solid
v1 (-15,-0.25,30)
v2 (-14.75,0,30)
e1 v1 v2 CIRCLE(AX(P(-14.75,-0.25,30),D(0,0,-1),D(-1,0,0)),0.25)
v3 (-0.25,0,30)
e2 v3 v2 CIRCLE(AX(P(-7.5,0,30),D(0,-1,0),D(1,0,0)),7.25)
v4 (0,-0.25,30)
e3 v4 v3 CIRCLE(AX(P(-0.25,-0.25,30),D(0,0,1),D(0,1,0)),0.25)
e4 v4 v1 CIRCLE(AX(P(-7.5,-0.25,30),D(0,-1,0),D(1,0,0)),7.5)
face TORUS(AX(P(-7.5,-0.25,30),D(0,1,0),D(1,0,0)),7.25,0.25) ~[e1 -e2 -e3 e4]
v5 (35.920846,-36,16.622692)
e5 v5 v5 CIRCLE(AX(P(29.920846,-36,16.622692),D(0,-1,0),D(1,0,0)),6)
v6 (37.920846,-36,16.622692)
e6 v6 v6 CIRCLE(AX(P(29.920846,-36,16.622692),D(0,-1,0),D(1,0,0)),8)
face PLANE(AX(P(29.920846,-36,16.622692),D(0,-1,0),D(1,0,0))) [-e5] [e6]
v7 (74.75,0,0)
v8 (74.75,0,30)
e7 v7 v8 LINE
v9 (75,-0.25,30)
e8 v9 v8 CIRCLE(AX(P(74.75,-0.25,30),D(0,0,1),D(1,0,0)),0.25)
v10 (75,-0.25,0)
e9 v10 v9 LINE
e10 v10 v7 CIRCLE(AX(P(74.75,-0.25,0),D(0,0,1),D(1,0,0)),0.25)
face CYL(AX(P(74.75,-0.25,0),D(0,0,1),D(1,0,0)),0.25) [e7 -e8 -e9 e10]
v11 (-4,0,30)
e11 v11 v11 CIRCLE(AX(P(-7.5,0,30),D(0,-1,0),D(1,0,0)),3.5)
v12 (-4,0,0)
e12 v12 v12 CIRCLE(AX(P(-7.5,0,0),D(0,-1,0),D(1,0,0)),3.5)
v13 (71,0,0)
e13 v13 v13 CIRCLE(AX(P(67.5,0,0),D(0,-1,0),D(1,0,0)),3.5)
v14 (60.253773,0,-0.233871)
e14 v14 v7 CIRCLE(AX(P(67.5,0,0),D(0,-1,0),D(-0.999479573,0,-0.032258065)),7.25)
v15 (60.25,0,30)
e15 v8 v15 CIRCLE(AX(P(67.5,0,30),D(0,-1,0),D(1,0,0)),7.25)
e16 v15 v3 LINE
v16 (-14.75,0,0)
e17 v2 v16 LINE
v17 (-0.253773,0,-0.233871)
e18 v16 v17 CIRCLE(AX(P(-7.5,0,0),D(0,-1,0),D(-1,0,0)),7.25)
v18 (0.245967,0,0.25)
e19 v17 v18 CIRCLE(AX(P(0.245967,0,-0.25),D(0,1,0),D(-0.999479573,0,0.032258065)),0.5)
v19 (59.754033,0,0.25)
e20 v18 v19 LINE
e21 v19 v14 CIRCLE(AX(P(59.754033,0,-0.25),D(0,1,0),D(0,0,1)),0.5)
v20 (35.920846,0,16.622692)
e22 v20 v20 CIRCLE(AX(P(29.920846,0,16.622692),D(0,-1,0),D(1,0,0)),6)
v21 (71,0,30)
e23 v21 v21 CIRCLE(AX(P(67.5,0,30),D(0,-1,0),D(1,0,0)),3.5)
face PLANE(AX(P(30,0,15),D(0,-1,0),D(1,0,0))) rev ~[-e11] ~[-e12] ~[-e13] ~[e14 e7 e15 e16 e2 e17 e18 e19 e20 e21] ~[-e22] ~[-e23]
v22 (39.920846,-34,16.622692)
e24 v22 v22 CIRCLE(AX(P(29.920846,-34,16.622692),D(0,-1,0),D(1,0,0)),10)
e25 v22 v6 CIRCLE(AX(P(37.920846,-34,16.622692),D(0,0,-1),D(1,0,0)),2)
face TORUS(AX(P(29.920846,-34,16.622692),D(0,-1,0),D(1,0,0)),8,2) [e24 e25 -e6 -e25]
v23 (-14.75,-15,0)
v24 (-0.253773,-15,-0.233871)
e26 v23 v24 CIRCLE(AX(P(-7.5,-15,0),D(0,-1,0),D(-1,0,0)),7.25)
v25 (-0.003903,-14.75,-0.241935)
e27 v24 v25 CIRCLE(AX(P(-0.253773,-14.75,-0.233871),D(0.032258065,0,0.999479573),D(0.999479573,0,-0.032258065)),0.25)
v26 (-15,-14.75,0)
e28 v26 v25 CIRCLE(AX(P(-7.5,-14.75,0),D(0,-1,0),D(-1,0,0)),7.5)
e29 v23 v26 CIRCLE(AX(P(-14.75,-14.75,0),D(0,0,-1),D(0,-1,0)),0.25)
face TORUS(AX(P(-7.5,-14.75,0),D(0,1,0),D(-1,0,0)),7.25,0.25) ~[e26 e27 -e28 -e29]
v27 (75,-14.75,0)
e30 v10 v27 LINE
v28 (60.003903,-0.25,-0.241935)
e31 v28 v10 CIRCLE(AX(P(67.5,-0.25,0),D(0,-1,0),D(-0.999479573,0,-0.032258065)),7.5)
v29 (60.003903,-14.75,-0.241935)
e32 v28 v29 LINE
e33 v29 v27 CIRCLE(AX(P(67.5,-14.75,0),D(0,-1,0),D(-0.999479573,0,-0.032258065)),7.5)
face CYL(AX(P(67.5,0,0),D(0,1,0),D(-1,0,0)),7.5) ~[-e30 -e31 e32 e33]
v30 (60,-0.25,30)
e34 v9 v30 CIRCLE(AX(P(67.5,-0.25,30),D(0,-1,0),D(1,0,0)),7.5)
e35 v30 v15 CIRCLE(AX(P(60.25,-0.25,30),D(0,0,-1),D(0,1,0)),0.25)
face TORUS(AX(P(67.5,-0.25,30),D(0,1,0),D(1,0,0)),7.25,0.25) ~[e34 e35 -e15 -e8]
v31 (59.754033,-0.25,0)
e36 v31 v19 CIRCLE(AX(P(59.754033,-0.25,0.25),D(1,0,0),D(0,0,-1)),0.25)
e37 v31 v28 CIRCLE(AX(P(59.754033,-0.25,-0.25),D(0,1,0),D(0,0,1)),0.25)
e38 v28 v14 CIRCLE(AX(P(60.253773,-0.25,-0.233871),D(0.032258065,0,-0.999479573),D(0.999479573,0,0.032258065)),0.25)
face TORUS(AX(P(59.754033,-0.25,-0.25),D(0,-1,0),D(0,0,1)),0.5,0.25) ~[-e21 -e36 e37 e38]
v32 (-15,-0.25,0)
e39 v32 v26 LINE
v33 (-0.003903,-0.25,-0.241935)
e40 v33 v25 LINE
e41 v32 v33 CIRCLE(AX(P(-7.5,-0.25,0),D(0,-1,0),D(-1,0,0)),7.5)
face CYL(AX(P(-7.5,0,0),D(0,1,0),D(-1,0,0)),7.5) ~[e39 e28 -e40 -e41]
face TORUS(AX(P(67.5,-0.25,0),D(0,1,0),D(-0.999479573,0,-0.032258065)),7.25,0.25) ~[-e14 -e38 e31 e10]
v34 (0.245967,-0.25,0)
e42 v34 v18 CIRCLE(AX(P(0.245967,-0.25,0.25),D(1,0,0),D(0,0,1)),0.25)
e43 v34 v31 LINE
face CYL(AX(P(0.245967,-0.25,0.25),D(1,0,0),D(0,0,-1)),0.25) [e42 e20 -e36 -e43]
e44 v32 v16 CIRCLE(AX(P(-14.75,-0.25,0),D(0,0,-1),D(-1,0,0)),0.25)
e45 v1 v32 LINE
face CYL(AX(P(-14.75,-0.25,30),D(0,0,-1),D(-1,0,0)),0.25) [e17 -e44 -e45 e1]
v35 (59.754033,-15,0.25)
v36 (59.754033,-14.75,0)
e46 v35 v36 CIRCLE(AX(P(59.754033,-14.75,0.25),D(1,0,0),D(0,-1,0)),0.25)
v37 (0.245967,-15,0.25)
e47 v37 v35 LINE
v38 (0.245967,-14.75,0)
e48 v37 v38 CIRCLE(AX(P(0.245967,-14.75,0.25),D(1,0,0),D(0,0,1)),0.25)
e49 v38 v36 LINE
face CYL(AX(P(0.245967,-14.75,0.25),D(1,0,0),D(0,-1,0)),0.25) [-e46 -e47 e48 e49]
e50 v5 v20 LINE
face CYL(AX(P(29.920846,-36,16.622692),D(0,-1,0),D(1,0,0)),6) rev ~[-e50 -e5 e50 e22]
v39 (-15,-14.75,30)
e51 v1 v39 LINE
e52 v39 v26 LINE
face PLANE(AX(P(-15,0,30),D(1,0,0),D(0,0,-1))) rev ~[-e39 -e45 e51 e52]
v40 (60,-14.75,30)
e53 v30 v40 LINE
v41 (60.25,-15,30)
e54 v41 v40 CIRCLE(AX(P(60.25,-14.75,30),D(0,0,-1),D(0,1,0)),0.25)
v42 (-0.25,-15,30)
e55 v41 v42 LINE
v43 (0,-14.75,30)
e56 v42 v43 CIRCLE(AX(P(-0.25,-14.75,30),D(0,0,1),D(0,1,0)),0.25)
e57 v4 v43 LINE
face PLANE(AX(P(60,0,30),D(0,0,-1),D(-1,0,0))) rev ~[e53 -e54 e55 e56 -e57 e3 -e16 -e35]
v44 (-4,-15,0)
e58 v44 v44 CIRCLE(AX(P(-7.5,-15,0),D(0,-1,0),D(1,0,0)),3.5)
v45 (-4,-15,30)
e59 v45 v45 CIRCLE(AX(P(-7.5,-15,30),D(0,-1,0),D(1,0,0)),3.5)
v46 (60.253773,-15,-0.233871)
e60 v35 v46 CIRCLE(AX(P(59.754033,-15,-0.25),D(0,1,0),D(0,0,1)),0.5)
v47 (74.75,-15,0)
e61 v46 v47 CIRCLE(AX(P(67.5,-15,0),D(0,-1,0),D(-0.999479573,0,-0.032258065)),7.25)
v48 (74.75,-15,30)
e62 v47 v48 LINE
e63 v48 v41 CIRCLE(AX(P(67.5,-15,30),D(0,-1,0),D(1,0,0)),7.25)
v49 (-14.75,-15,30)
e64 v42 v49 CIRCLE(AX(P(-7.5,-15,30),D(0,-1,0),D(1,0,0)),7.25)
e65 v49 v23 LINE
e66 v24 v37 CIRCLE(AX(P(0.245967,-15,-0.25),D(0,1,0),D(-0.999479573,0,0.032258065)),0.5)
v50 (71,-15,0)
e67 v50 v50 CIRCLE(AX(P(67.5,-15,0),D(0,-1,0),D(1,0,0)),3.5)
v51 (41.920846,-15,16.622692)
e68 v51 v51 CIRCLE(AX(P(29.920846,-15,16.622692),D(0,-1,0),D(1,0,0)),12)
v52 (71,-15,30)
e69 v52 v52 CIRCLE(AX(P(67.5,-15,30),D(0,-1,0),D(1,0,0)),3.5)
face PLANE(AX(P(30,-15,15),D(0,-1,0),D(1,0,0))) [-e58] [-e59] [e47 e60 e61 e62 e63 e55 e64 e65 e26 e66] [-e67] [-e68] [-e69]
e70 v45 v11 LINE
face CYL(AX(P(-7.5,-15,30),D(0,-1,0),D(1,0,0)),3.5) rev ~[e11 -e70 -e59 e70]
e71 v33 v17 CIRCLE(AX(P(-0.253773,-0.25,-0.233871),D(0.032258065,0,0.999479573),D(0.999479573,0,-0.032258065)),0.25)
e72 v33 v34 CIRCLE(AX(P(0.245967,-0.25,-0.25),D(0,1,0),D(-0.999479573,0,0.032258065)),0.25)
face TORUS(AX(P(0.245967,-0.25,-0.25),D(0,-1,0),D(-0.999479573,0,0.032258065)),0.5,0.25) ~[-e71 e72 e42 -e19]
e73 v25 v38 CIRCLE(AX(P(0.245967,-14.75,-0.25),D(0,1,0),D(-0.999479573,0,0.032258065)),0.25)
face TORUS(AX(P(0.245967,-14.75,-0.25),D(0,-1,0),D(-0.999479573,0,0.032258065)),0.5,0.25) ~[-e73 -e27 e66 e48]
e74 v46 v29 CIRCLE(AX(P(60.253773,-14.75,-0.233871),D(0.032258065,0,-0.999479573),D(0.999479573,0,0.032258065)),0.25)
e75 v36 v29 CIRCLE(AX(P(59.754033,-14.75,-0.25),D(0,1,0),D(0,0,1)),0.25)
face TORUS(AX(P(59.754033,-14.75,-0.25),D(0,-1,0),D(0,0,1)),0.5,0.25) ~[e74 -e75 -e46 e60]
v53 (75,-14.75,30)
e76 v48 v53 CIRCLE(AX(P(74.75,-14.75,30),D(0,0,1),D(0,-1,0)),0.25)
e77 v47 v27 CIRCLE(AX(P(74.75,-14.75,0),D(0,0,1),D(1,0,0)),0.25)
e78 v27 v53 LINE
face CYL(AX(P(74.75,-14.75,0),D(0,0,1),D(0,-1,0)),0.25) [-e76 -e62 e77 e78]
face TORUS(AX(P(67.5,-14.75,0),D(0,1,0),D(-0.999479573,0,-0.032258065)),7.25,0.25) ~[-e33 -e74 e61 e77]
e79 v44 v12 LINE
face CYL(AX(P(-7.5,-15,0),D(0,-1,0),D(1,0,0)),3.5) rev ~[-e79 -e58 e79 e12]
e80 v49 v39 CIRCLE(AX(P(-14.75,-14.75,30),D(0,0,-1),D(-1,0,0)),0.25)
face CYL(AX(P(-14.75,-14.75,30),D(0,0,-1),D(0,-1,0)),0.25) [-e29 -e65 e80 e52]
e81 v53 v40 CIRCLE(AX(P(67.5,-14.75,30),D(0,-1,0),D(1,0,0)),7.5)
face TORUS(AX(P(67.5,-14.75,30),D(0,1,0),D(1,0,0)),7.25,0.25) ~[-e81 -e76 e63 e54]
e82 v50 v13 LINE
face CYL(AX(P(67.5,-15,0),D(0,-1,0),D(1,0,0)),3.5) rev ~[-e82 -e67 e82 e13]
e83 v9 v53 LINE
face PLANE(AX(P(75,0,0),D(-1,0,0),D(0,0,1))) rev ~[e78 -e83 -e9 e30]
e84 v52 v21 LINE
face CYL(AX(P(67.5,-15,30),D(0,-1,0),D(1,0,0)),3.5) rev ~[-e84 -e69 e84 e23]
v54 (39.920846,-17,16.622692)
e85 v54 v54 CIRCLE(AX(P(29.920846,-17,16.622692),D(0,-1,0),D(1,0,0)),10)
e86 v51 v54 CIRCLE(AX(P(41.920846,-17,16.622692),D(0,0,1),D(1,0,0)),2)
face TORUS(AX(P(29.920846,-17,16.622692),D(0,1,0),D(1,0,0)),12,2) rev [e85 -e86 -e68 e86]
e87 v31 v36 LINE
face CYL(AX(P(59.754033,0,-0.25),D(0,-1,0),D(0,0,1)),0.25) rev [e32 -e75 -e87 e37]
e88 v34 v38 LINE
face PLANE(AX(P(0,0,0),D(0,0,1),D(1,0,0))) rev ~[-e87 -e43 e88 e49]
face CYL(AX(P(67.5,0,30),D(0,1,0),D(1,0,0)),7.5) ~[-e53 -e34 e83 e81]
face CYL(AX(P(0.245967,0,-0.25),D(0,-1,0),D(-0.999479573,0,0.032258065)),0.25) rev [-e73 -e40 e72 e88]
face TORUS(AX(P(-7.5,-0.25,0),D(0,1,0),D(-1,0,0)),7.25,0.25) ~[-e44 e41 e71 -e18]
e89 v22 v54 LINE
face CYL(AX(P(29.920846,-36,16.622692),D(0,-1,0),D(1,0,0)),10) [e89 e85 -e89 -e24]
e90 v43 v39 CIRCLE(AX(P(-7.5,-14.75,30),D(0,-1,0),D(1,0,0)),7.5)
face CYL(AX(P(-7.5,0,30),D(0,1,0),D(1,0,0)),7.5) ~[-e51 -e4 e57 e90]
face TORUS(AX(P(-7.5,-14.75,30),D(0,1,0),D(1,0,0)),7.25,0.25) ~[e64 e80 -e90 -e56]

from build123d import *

# Parameters (mm, degrees)
F1_DEPTH = 15
F3_R     = 10
F4_DEPTH = 21
F5_R     = 6
F6_DEPTH = 36
F7_R     = 3.5
F8_DEPTH = 15.001
F9_R     = 2
F10_F1_R = 0.25
F10_F2_R = 0.25


with BuildPart() as f1:
    # F0 (on Front) → F1 (new body)
    with BuildSketch(Plane.XZ):
        with BuildLine():
            ThreePointArc((-15, 0), (-7.5, -7.5), (0, 0))
            Line((0, 0), (60, 0))
            ThreePointArc((60, 0), (67.5, -7.5), (75, 0))
            Line((75, 0), (75, 30))
            ThreePointArc((75, 30), (67.5, 37.5), (60, 30))
            Line((60, 30), (0, 30))
            ThreePointArc((0, 30), (-7.5, 37.5), (-15, 30))
            Line((-15, 30), (-15, 0))
        make_face()
    extrude(amount=F1_DEPTH)

    # F3 (on offset) → F4 (join, through all)
    with BuildSketch(Plane.XZ.offset(36)):
        with Locations((29.9208462238, 16.6226923466)):
            Circle(F3_R)
    extrude(amount=-F4_DEPTH)

    # F5 (on face) → F6 (cut, through all)
    with BuildSketch(Plane.XZ.offset(36)):
        with Locations((29.9208462238, 16.6226923466)):
            Circle(F5_R)
    extrude(amount=-F6_DEPTH, mode=Mode.SUBTRACT)

    # F7 (on face) → F8 (cut, through all)
    with BuildSketch(Plane.XZ.offset(15)):
        with Locations((-7.5, 30)):
            Circle(F7_R)
        with Locations((-7.5, 0)):
            Circle(F7_R)
        with Locations((67.5, 30)):
            Circle(F7_R)
        with Locations((67.5, 0)):
            Circle(F7_R)
    extrude(amount=-F8_DEPTH, mode=Mode.SUBTRACT)

    # F9
    f9_edges = [f1.edges().sort_by_distance(p)[0] for p in [
        (39.920846, -25.5, 16.622692),
        (19.920846, -36, 16.622692),
        (19.920846, -15, 16.622692),
    ]]
    fillet(f9_edges, radius=F9_R)

    # F10: fillet of radius 0.25 on 4 edges, made by hand

    # F10_f1
    f10_f1_edges = [f1.edges().sort_by_distance(p)[0] for p in [
        (0, -7.5, 0),
        (60, -7.5, 0),
    ]]
    fillet(f10_f1_edges, radius=F10_F1_R)

    # F10_f2
    f10_f2_edges = [f1.edges().sort_by_distance(p)[0] for p in [
        (30, 0, 0),
        (30, -15, 0),
        (0.0720646065, -15, -0.070394698),
        (59.9279353935, -15, -0.070394698),
        (0.0720646065, 0, -0.070394698),
        (59.9279353935, 0, -0.070394698),
    ]]
    fillet(f10_f2_edges, radius=F10_F2_R)


solid = f1.part
